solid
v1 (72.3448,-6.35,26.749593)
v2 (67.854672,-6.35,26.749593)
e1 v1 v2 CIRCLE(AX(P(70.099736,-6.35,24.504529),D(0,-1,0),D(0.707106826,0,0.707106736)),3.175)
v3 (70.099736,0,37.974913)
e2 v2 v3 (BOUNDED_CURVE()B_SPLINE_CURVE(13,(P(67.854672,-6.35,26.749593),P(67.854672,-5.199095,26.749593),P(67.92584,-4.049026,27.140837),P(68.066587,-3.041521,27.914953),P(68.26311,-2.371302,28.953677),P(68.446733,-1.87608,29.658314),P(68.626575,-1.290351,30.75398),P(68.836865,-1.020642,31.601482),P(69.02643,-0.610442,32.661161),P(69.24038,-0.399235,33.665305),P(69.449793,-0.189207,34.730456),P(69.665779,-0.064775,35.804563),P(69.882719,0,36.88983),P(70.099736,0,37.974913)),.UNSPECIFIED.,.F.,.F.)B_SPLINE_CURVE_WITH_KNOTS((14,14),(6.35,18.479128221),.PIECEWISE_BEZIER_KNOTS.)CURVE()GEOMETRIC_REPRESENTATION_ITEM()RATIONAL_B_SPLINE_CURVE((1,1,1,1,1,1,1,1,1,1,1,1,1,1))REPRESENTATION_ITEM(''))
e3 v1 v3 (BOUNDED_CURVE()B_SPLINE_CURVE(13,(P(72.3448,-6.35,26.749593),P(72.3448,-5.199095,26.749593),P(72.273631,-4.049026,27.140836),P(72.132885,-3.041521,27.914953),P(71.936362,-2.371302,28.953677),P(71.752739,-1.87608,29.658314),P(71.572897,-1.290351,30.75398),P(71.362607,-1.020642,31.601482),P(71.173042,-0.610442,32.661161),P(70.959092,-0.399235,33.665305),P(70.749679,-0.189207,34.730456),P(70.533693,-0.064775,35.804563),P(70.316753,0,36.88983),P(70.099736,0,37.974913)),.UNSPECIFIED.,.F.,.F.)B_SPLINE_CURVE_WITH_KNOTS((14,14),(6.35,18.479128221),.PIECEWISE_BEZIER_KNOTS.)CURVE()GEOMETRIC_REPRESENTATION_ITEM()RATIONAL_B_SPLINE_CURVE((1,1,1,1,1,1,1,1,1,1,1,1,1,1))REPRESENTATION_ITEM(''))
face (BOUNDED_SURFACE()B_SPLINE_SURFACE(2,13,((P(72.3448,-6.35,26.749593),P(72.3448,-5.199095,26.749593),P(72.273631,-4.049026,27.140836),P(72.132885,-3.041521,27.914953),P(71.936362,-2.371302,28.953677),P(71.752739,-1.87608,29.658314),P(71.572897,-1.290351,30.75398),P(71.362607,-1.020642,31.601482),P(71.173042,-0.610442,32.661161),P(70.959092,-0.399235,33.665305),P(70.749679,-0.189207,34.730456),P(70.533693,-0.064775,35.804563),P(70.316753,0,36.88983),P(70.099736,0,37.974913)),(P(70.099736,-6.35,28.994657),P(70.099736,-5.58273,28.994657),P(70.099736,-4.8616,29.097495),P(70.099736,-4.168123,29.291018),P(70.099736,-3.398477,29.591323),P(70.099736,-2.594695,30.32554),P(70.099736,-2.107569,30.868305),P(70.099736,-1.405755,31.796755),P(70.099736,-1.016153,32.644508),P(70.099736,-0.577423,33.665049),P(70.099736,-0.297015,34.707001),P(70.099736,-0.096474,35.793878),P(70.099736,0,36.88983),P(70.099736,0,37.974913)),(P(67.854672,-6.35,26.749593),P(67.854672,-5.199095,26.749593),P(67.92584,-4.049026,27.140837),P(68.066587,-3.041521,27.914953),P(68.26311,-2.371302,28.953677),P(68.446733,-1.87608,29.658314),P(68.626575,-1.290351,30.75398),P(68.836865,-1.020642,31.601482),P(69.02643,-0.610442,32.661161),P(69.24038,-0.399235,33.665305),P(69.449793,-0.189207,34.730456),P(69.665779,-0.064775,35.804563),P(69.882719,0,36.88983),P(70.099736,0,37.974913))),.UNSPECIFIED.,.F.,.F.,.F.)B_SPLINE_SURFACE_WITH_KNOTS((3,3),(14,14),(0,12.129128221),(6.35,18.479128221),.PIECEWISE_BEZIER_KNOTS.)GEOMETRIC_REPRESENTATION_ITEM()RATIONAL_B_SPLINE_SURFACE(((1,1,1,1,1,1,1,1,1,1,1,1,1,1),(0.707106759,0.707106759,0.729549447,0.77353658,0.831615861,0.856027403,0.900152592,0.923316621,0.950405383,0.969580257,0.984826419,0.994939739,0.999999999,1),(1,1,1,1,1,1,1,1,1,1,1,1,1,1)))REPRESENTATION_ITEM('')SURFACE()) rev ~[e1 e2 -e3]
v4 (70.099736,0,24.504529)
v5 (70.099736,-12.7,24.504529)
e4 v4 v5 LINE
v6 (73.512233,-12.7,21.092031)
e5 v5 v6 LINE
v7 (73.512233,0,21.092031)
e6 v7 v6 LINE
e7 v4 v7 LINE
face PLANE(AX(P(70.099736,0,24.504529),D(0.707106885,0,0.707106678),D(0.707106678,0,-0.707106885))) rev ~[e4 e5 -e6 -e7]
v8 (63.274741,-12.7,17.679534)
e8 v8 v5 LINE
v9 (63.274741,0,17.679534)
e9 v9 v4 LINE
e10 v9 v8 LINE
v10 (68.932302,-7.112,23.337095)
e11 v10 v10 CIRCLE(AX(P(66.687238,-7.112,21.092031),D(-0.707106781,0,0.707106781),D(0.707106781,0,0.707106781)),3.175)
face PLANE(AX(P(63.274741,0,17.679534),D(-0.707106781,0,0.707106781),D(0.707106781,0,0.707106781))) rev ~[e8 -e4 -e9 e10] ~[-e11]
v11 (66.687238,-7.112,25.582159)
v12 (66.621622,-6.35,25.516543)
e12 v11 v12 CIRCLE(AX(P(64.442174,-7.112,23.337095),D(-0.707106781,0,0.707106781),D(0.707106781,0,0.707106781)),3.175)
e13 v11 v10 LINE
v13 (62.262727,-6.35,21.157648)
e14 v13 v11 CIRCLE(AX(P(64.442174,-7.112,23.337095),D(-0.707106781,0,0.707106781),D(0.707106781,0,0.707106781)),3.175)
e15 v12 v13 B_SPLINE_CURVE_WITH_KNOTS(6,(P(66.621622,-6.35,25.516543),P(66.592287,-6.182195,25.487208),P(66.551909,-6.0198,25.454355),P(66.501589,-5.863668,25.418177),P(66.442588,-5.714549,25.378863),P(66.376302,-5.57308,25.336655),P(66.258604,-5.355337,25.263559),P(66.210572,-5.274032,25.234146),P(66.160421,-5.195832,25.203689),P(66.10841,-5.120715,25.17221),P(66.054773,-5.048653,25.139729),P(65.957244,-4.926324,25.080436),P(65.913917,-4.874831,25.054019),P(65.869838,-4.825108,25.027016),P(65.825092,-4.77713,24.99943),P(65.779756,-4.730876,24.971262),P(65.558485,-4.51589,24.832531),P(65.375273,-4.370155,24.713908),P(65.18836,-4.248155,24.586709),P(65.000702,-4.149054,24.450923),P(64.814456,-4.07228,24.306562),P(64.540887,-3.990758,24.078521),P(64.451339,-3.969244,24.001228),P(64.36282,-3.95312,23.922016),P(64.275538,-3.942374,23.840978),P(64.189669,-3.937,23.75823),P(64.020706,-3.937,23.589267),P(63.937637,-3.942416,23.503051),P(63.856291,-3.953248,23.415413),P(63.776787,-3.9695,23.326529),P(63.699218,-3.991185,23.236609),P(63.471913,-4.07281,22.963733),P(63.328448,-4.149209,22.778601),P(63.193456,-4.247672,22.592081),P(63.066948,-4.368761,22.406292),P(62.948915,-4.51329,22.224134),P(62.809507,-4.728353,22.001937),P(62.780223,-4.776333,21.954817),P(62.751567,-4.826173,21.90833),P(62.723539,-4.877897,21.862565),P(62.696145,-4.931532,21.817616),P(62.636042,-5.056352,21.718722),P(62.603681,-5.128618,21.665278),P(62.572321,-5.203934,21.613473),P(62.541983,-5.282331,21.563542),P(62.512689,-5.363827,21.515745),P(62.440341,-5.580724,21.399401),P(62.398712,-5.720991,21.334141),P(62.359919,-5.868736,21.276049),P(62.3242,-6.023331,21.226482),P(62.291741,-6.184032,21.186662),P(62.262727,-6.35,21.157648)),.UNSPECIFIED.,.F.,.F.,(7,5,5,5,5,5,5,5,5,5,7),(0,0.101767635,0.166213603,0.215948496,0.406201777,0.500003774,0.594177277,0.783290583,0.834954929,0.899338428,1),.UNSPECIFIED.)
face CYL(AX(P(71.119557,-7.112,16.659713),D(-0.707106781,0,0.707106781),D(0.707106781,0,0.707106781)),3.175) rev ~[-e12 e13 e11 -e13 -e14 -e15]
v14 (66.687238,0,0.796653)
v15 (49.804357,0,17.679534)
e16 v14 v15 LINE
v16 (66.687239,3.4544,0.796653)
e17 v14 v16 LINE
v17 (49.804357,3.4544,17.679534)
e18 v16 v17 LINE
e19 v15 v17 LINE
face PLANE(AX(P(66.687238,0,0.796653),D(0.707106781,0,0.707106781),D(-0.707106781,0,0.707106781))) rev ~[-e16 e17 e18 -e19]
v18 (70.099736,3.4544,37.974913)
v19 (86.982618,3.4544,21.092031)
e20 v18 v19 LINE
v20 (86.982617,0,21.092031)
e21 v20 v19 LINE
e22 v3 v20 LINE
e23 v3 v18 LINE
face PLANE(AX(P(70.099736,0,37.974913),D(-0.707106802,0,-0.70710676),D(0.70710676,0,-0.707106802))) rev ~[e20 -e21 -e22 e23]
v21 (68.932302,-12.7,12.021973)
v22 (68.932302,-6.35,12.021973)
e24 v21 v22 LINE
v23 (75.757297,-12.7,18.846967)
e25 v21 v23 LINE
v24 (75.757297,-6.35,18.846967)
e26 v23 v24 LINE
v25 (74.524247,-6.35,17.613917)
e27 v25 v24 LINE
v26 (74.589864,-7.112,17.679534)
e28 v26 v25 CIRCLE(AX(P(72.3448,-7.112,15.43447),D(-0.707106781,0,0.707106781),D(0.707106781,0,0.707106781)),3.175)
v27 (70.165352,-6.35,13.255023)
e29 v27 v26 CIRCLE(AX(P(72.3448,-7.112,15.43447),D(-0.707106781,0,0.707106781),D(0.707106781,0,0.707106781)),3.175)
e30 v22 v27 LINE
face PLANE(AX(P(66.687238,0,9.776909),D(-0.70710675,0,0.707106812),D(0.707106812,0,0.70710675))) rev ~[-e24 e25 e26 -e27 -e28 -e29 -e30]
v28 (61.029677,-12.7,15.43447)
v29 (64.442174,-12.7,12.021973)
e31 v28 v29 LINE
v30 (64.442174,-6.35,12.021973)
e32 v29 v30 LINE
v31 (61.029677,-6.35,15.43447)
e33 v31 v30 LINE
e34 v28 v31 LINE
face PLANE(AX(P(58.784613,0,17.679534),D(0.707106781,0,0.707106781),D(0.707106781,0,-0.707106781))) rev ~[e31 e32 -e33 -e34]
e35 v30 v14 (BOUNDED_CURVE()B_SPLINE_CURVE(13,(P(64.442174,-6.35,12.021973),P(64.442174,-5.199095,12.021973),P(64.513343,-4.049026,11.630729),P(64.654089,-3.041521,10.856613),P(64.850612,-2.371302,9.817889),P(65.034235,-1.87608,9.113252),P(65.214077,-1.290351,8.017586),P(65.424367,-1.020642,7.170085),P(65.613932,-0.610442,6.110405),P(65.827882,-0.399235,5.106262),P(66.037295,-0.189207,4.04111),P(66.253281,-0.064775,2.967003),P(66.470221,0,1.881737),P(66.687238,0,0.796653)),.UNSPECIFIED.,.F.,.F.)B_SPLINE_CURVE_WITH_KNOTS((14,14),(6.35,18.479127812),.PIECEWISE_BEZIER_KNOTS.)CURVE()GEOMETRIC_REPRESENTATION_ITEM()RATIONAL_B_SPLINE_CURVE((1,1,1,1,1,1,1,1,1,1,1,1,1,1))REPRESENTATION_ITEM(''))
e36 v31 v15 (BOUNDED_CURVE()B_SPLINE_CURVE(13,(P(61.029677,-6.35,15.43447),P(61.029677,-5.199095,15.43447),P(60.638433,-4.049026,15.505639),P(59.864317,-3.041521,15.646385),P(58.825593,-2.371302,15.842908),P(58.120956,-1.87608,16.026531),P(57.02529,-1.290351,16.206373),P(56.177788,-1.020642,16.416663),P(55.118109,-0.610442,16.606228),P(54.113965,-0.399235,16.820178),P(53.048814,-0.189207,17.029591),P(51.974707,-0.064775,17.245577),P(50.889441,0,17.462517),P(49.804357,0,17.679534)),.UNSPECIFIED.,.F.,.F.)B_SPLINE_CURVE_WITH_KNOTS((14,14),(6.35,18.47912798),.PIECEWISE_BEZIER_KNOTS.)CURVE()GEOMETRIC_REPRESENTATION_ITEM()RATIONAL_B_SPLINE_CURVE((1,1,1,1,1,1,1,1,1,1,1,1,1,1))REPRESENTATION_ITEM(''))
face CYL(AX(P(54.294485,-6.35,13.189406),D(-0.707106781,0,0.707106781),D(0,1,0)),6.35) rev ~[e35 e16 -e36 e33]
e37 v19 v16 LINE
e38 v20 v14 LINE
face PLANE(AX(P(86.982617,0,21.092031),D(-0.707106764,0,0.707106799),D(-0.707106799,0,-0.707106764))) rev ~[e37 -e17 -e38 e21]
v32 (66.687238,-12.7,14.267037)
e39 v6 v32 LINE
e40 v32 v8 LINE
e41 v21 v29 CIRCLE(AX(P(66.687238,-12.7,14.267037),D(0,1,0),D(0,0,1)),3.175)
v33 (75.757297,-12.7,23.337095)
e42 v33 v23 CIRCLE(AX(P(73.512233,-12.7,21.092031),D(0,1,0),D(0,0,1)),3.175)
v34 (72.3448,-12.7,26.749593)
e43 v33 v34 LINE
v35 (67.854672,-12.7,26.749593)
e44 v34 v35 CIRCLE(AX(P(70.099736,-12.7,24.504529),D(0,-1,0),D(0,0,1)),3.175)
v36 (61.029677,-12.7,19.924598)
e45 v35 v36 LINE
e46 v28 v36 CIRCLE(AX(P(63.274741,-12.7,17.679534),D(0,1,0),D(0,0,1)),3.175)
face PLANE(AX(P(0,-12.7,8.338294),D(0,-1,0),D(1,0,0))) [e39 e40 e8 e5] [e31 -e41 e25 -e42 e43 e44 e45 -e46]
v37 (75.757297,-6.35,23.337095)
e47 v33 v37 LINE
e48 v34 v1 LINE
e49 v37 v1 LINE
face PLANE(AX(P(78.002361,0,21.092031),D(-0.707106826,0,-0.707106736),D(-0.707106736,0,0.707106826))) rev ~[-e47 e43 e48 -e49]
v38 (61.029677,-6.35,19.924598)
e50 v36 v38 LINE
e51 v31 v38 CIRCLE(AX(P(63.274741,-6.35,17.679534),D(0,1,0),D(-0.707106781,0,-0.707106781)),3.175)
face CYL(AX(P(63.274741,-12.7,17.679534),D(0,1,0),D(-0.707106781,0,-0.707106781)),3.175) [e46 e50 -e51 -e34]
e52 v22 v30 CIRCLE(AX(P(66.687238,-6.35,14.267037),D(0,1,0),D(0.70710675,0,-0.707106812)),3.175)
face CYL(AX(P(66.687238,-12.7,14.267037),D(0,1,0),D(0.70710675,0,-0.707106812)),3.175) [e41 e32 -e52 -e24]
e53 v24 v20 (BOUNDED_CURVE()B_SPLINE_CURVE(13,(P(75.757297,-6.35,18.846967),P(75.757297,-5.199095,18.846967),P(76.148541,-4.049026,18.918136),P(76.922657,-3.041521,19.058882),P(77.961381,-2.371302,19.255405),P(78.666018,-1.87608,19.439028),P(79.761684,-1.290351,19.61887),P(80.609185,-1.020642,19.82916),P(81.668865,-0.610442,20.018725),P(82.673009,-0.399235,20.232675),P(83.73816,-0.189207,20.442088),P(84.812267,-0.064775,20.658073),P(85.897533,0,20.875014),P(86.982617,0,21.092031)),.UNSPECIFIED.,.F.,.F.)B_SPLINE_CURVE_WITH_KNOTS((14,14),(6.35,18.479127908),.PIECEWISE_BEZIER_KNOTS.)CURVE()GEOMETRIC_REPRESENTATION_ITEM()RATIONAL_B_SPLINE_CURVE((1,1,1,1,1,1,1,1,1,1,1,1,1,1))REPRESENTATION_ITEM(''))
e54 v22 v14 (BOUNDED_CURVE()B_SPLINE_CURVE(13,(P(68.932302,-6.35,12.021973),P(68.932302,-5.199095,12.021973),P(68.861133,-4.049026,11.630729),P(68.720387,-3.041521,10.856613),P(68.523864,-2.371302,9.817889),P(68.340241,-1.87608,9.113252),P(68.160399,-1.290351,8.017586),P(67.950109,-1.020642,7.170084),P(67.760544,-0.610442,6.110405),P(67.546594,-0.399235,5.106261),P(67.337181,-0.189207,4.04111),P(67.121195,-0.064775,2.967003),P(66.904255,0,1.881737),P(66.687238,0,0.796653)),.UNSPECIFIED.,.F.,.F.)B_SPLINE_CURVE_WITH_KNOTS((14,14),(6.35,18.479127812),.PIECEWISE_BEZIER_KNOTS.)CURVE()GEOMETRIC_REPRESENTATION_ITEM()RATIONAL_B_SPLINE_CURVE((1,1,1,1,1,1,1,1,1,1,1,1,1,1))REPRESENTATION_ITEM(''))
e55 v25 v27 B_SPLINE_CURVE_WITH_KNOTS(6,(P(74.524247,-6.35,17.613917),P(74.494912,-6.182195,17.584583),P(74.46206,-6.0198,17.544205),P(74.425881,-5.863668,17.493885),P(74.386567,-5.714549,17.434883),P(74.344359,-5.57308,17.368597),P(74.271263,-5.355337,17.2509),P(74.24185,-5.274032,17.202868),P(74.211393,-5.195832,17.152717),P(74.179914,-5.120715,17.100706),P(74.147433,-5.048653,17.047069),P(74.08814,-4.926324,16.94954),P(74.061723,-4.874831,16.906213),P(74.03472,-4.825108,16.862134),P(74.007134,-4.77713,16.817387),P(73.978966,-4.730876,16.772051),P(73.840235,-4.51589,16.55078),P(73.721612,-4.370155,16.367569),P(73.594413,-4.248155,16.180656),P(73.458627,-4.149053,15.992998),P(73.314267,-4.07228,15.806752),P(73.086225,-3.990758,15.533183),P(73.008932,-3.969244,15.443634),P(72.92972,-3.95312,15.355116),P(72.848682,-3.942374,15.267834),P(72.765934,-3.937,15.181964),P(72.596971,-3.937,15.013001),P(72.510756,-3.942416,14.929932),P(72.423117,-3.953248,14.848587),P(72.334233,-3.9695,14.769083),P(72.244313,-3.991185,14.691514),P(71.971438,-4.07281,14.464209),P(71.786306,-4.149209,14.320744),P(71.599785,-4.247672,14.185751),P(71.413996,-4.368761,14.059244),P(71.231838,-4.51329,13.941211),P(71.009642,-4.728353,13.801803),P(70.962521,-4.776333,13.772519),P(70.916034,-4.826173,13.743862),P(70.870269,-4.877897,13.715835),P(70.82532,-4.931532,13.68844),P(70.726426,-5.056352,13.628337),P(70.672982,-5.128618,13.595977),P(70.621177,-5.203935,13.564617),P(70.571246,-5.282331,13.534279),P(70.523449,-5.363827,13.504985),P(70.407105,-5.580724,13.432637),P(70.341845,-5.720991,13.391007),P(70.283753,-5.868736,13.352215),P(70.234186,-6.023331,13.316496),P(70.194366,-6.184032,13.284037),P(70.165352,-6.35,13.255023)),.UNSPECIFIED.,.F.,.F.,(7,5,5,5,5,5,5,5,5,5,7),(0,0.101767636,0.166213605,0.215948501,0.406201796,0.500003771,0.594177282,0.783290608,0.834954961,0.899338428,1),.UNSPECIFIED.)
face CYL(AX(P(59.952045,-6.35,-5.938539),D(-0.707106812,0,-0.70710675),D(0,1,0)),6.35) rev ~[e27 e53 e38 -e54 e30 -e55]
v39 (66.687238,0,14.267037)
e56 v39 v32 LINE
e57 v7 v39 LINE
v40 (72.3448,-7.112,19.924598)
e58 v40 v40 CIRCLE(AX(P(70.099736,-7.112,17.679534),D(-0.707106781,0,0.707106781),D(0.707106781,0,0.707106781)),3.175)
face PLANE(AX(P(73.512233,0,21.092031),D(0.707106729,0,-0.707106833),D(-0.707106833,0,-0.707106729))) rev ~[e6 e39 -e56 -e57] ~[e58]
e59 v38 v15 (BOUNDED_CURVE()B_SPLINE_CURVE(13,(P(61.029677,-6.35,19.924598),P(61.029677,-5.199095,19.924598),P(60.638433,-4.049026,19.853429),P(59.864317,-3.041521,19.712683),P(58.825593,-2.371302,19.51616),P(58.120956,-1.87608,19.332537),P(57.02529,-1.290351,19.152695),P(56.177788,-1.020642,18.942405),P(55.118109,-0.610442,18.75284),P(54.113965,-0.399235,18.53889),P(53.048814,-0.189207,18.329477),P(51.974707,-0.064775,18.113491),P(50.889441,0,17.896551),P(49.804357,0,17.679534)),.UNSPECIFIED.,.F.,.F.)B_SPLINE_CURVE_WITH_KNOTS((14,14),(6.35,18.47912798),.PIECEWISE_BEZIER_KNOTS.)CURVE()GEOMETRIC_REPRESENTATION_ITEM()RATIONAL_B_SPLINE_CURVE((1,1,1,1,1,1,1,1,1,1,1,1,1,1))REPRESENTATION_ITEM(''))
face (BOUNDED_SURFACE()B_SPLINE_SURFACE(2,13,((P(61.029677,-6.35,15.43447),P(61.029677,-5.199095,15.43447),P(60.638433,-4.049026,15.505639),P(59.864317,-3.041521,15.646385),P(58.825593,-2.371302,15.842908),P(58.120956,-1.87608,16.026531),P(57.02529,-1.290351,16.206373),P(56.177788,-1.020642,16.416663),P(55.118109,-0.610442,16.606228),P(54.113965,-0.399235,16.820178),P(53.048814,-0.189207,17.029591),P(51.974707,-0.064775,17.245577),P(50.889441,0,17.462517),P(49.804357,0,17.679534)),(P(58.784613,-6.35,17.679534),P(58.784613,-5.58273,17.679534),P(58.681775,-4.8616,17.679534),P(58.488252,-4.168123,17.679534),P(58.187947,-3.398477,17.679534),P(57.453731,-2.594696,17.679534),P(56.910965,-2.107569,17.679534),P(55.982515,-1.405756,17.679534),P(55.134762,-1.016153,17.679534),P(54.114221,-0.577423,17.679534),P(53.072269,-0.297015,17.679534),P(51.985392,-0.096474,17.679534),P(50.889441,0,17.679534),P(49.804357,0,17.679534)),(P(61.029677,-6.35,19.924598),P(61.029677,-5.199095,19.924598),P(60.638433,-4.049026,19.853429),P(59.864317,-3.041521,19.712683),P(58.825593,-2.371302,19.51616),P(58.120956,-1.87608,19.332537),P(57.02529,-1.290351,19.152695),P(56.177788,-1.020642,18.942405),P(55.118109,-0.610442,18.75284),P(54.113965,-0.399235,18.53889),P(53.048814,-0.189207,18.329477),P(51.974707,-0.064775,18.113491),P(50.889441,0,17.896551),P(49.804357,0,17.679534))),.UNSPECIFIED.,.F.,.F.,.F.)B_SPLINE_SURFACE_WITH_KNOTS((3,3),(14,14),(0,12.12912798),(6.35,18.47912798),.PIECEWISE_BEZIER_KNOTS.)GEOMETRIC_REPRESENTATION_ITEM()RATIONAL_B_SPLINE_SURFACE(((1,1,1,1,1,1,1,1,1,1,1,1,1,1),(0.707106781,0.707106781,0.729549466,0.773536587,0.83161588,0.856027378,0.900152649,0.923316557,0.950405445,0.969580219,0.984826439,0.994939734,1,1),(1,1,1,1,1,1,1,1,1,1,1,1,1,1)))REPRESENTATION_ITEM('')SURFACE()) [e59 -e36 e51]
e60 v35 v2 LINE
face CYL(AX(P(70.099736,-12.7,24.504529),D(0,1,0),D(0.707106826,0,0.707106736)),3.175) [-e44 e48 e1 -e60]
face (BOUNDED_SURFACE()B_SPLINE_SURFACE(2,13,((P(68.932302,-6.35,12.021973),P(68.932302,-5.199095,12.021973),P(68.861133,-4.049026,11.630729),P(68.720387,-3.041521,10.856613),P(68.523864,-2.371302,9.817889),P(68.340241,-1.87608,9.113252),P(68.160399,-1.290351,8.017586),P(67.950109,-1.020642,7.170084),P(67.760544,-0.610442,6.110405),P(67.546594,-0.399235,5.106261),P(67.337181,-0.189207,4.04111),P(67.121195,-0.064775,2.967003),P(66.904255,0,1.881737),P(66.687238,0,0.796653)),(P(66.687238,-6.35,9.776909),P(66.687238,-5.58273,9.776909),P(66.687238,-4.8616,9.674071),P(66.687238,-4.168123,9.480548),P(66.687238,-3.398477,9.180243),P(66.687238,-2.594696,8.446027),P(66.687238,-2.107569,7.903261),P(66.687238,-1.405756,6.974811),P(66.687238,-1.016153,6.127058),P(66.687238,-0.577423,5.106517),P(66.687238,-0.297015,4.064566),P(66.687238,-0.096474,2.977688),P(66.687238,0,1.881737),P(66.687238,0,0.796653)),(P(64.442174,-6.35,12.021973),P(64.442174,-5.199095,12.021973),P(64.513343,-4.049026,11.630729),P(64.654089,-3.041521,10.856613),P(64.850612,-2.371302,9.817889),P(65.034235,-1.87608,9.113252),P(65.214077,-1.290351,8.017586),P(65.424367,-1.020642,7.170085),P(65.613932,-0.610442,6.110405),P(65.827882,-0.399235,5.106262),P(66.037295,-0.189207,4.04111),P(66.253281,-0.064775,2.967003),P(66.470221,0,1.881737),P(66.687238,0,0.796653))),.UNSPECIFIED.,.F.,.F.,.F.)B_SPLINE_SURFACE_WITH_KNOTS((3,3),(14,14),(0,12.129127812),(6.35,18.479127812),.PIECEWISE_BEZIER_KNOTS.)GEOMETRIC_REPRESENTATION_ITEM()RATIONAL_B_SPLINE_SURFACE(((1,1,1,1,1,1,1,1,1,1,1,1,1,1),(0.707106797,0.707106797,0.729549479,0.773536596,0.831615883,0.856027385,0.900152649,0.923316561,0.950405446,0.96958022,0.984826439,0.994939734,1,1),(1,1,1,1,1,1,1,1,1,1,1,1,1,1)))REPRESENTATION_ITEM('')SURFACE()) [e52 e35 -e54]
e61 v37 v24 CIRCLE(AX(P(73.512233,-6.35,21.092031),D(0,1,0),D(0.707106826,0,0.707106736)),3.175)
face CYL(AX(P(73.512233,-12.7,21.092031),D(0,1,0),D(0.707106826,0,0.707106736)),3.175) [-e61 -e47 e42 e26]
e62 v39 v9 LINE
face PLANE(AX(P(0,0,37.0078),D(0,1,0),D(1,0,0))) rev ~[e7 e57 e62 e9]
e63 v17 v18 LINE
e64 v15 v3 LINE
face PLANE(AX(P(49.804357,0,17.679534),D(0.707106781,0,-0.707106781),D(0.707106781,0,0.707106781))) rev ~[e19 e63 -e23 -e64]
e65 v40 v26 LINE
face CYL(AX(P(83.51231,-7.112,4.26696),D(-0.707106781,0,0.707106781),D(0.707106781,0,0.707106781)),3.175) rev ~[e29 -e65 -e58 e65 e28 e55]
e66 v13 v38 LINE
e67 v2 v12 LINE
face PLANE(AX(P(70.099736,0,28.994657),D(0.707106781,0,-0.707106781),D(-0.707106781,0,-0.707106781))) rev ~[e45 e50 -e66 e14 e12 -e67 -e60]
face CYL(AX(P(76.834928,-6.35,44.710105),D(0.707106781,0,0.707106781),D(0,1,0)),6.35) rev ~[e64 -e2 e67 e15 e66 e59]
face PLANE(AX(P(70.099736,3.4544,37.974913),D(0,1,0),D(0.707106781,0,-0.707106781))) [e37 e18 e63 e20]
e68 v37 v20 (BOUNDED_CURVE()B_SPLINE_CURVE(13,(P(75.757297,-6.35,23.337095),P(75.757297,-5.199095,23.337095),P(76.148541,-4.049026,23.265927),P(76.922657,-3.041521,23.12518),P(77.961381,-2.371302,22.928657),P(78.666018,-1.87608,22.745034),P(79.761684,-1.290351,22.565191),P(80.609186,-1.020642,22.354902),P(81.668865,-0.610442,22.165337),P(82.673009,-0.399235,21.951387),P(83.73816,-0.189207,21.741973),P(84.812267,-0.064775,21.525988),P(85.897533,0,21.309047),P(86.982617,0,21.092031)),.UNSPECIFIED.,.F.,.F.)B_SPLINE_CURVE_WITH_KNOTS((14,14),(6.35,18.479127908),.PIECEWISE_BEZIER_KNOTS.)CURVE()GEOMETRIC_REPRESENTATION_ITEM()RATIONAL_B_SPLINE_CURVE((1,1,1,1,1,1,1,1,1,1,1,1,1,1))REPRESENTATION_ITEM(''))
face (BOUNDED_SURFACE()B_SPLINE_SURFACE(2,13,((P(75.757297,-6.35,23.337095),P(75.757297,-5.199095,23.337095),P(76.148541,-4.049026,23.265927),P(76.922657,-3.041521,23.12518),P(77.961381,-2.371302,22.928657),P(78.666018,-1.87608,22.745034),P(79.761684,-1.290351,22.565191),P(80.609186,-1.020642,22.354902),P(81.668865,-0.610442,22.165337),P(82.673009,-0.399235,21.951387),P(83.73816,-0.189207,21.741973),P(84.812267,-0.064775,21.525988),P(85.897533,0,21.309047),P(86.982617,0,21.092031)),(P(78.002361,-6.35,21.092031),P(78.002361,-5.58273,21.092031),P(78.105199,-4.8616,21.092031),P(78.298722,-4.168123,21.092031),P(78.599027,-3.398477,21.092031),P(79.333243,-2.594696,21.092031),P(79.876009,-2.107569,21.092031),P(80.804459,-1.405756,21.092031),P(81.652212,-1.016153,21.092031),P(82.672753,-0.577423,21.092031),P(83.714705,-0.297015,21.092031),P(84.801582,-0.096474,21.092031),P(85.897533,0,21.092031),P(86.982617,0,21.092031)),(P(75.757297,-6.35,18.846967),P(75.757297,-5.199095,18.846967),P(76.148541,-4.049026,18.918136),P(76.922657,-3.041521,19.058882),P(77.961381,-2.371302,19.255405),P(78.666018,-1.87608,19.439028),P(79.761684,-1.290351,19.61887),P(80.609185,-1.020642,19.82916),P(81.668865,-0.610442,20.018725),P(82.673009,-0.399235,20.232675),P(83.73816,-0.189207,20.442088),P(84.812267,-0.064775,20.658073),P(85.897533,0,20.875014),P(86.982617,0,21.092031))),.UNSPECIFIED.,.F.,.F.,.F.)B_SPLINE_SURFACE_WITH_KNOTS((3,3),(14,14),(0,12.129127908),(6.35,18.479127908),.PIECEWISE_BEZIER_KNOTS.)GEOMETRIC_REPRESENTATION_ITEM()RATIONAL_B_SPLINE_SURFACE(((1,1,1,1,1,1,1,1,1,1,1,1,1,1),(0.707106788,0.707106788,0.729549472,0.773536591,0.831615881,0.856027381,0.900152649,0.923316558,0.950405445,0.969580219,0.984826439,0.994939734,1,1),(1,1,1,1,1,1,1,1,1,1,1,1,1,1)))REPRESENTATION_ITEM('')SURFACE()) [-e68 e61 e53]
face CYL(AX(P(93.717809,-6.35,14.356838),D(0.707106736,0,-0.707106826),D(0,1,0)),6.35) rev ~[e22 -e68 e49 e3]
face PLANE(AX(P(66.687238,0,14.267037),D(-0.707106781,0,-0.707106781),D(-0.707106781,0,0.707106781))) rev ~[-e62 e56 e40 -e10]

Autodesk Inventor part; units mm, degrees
ref_plane "YZ Plane" through (0, 0, 0) normal (1, 0, 0) x (0, 1, 0)
ref_plane "XZ Plane" through (0, 0, 0) normal (0, 1, 0) x (-1, 0, 0)
ref_plane "XY Plane" through (0, 0, 0) normal (0, 0, 1) x (1, 0, 0)
sketch "Sketch1" plane through (0, 0, 0) normal (1, 0, 0) x (0, 1, 0)
  line L0 (0, 0) -> (41.5544, 0)
  line L1 (41.5544, 0) -> (41.5544, 37.0078)
  line L2 (41.5544, 37.0078) -> (0, 37.0078)
  line L3 (0, 37.0078) -> (0, 0)
  circle A0 centre (20.7772, 18.5039) radius 12.8778
  dimension "d0" = 41.5544
  dimension "d1" = 37.0078
  dimension "d2" = 25.7556
sketch "Sketch1 outline for Extrusion1" plane through (0, 0, 0) normal (1, 0, 0) x (0, 1, 0)
  line L0 (0, 0) -> (41.5544, 0)
  line L1 (0, 37.0078) -> (0, 0)
  line L2 (41.5544, 0) -> (41.5544, 37.0078)
  line L3 (41.5544, 37.0078) -> (0, 37.0078)
  circle A0 centre (20.7772, 18.5039) radius 12.8778
extrude "Extrusion1" add sketch "Sketch1 outline for Extrusion1" along normal blind 50.8
sketch "Sketch2" plane through (0, 0, 0) normal (0, 0, -1) x (-1, 0, 0)
  line L0 (-50.8, 0) -> (-50.8, 41.5544) projected
  line L1 (-50.8, 41.5544) -> (-87.8078, 41.5544)
  line L2 (-87.8078, 41.5544) -> (-87.8078, 0)
  line L3 (-87.8078, 0) -> (-50.8, 0)
  line L4 (-50.8, 0) -> (-50.8, 41.5544)
  circle A0 centre (-69.3039, 20.7772) radius 12.8778
  dimension "d5" = 37.0078
  dimension "d6" = 25.7556
sketch "Sketch2 outline for Extrusion2" plane through (0, 0, 0) normal (0, 0, -1) x (-1, 0, 0)
  line L0 (-50.8, 41.5544) -> (-87.8078, 41.5544)
  line L1 (-50.8, 0) -> (-50.8, 41.5544)
  line L2 (-87.8078, 0) -> (-50.8, 0)
  line L3 (-87.8078, 41.5544) -> (-87.8078, 0)
extrude "Extrusion2" add sketch "Sketch2 outline for Extrusion2" against normal up to surface (37.0078 mm away)
sketch "Sketch3" plane through (0, 0, 0) normal (0, 0, -1) x (-1, 0, 0)
  line L0 (0, 41.5544) -> (-87.8078, 41.5544) projected
  line L1 (-87.8078, 41.5544) -> (-87.8078, 0) projected
  line L2 (0, 0) -> (-87.8078, 0) projected
  line L3 (0, 0) -> (-87.8078, 0) projected
  line L4 (-87.8078, 41.5544) -> (-50.8, 41.5544)
  line L5 (-50.8, 41.5544) -> (-50.8, 0)
  line L6 (-50.8, 0) -> (-87.8078, 0)
  line L7 (-87.8078, 0) -> (-87.8078, 41.5544)
  circle A0 centre (-69.3039, 20.7772) radius 12.8778
  point P0 (-50.8, 0)
  dimension "d9" = 37.0078
  dimension "d10" = 25.7556
sketch "Sketch3 outline for Extrusion3" plane through (0, 0, 0) normal (0, 0, -1) x (-1, 0, 0)
  line L0 (-50.8, 0) -> (-50.8, 41.5544)
  line L1 (-87.8078, 0) -> (-50.8, 0)
  line L2 (-50.8, 41.5544) -> (-87.8078, 41.5544)
  line L3 (-87.8078, 41.5544) -> (-87.8078, 0)
  circle A0 centre (-69.3039, 20.7772) radius 12.8778
extrude "Extrusion3" add sketch "Sketch3 outline for Extrusion3" along normal blind 50.8
sketch "Sketch4" plane through (0, 41.5544, 37.0078) normal (0, 1, 0) x (1, 0, 0)
  line L0 (0, 0) -> (87.8078, 0)
  line L1 (87.8078, 87.8078) -> (87.8078, 0)
  line L2 (50.8, 37.0078) -> (50.8, 87.8078)
  line L3 (87.8078, 0) -> (87.8078, 87.8078)
  line L4 (50.8, 37.0078) -> (87.8078, 0)
  line L5 (87.8078, 0) -> (123.159418, -36.481545)
  line L6 (87.8078, 0) -> (100.892033, 13.084233)
  line L7 (0, 0) -> (87.8078, 0)
  line L8 (87.8078, 0) -> (74.723567, -13.084233)
  line L9 (100.892033, 13.084233) -> (87.8078, 26.168466)
  line L10 (74.723567, -13.084233) -> (61.639334, 0)
  line L11 (100.892033, 13.084233) -> (136.808615, -22.832348)
  line L12 (136.808615, -22.832348) -> (123.159418, -36.481545)
  line L13 (123.159418, -36.481545) -> (110.640148, -49.000815)
  line L14 (123.159418, -36.481545) -> (140.864338, -36.481545) construction
  line L15 (110.640148, -49.000815) -> (74.723567, -13.084233)
  dimension "d13" = 50.8
  dimension "d14" = 18.5039
  dimension "d15" = 18.5039
  dimension "d16" = 135
sketch "Sketch4 outline for Extrusion4" plane through (0, 41.5544, 37.0078) normal (0, 1, 0) x (1, 0, 0)
  line L0 (87.8078, 0) -> (61.639334, 0)
  line L1 (87.8078, 26.168466) -> (87.8078, 0)
  line L2 (100.892033, 13.084233) -> (87.8078, 26.168466)
  line L3 (136.808615, -22.832348) -> (100.892033, 13.084233)
  line L4 (123.159418, -36.481545) -> (136.808615, -22.832348)
  line L5 (110.640148, -49.000815) -> (123.159418, -36.481545)
  line L6 (74.723567, -13.084233) -> (110.640148, -49.000815)
  line L7 (61.639334, 0) -> (74.723567, -13.084233)
extrude "Extrusion4" add sketch "Sketch4 outline for Extrusion4" against normal up to surface (41.5544 mm away)
sketch "Sketch5" plane through (136.808615, 0, 59.840148) normal (0.7071068, 0, 0.7071068) x (0.7071068, 0, -0.7071068)
  line L0 (-18.5039, 41.5544) -> (-18.5039, 0) projected
  circle A0 centre (-18.5039, 20.7772) radius 12.8778
  point P0 (-54.424924, 0)
  dimension "d19" = 25.7556
sketch "Sketch5 outline for Extrusion5" plane through (136.808615, 0, 59.840148) normal (0.7071068, 0, 0.7071068) x (0.7071068, 0, -0.7071068)
  circle A0 centre (-18.5039, 20.7772) radius 12.8778
extrude "Extrusion5" cut sketch "Sketch5 outline for Extrusion5" against normal blind 76.2
sketch "Sketch6" plane through (0, 41.5544, 37.0078) normal (0, 1, 0) x (1, 0, 0)
  line L0 (0, 37.0078) -> (0, 0)
  line L1 (0, 0) -> (61.639334, 0)
  line L2 (61.639334, 0) -> (110.640148, -49.000815)
  line L3 (110.640148, -49.000815) -> (136.808615, -22.832348)
  line L4 (136.808615, -22.832348) -> (87.8078, 26.168466)
  line L5 (87.8078, 87.8078) -> (87.8078, 26.168466)
  line L6 (50.8, 87.8078) -> (87.8078, 87.8078)
  line L7 (50.8, 37.0078) -> (50.8, 87.8078)
  line L8 (0, 37.0078) -> (50.8, 37.0078)
  line L9 (0, 18.5039) -> (69.3039, 18.5039)
  line L10 (69.3039, 18.5039) -> (69.3039, 87.8078)
  line L11 (56.4261, 87.8078) -> (82.1817, 87.8078)
  line L12 (69.3039, 18.5039) -> (123.724381, -35.916581)
  circle A0 centre (2.4892, 2.879001) radius 1.5875
  circle A1 centre (2.4892, 34.128799) radius 1.5875
  circle A2 centre (84.928799, 85.3186) radius 1.5875
  circle A3 centre (53.679001, 85.3186) radius 1.5875
  circle A4 centre (110.915779, -45.204923) radius 1.5875
  circle A5 centre (133.012723, -23.107979) radius 1.5875
  dimension "d22" = 3.175
  dimension "d23" = 3.175
  dimension "d24" = 2.4892
  dimension "d25" = 2.4892
  dimension "d26" = 2.879
  dimension "d27" = 2.879
  dimension "d28" = 3.175
  dimension "d29" = 3.175
  dimension "d30" = 2.4892
  dimension "d31" = 2.4892
  dimension "d32" = 2.879
  dimension "d33" = 2.879
  dimension "d34" = 3.175
  dimension "d35" = 3.175
  dimension "d36" = 2.4892
  dimension "d37" = 2.4892
  dimension "d38" = 2.879
  dimension "d39" = 2.879
sketch "Sketch6 outline for Extrusion6" plane through (0, 41.5544, 37.0078) normal (0, 1, 0) x (1, 0, 0)
  circle A0 centre (110.915779, -45.204923) radius 1.5875
  circle A1 centre (133.012723, -23.107979) radius 1.5875
  circle A2 centre (2.4892, 34.128799) radius 1.5875
  circle A3 centre (2.4892, 2.879001) radius 1.5875
  circle A4 centre (53.679001, 85.3186) radius 1.5875
  circle A5 centre (84.928799, 85.3186) radius 1.5875
extrude "Extrusion6" cut sketch "Sketch6 outline for Extrusion6" against normal blind 50.8
sketch "Sketch7" plane through (0, 41.5544, 37.0078) normal (0, 1, 0) x (1, 0, 0)
  circle A0 centre (2.4892, 2.879001) radius 1.5875
  circle A1 centre (110.915779, -45.204923) radius 1.5875
  circle A2 centre (53.679001, 85.3186) radius 1.5875
  circle A3 centre (2.4892, 34.128799) radius 1.5875
  circle A4 centre (84.928799, 85.3186) radius 1.5875
  line L0 (0, 37.0078) -> (0, 0)
  line L1 (0, 0) -> (61.639334, 0)
  line L2 (61.639334, 0) -> (110.640148, -49.000815)
  line L3 (110.640148, -49.000815) -> (136.808615, -22.832348)
  line L4 (136.808615, -22.832348) -> (87.8078, 26.168466)
  line L5 (87.8078, 87.8078) -> (87.8078, 26.168466)
  line L6 (50.8, 87.8078) -> (87.8078, 87.8078)
  line L7 (50.8, 37.0078) -> (50.8, 87.8078)
  line L8 (0, 37.0078) -> (50.8, 37.0078)
  circle A5 centre (133.012723, -23.107979) radius 1.5875
  circle A6 centre (133.012723, -23.107979) radius 6
  circle A7 centre (110.915779, -45.204923) radius 6
  circle A8 centre (2.4892, 2.879001) radius 6
  circle A9 centre (2.4892, 34.128799) radius 6
  circle A10 centre (53.679001, 85.3186) radius 6
  circle A11 centre (84.928799, 85.3186) radius 6
  point P0 (0, 8.338294)
  point P1 (7.753357, 0)
  point P2 (7.753357, 37.0078)
  point P3 (0, 28.669506)
  point P4 (59.138294, 87.8078)
  point P5 (50.8, 80.054443)
  point P6 (79.469506, 87.8078)
  point P7 (87.8078, 80.054443)
  point P8 (130.91255, -28.728413)
  point P9 (131.326163, -17.349897)
  point P10 (105.157697, -43.518363)
  point P11 (116.536213, -43.10475)
  dimension "d42" = 12
  dimension "d43" = 12
  dimension "d44" = 12
  dimension "d45" = 12
  dimension "d46" = 12
  dimension "d47" = 12
sketch "Sketch7 outline for Extrusion7" plane through (0, 41.5544, 37.0078) normal (0, 1, 0) x (1, 0, 0)
  arc A0 (0, 8.338294) -> (7.753357, 0) centre (2.4892, 2.879001) ccw
  line L0 (0, 0) -> (0, 8.338294)
  line L1 (7.753357, 0) -> (0, 0)
  arc A1 (7.753357, 37.0078) -> (0, 28.669506) centre (2.4892, 34.128799) ccw
  line L2 (0, 37.0078) -> (7.753357, 37.0078)
  line L3 (0, 28.669506) -> (0, 37.0078)
  arc A2 (59.138294, 87.8078) -> (50.8, 80.054443) centre (53.679001, 85.3186) ccw
  line L4 (50.8, 87.8078) -> (59.138294, 87.8078)
  line L5 (50.8, 80.054443) -> (50.8, 87.8078)
  arc A3 (87.8078, 80.054443) -> (79.469506, 87.8078) centre (84.928799, 85.3186) ccw
  line L6 (87.8078, 87.8078) -> (87.8078, 80.054443)
  line L7 (79.469506, 87.8078) -> (87.8078, 87.8078)
  arc A4 (130.91255, -28.728413) -> (131.326163, -17.349897) centre (133.012723, -23.107979) ccw
  line L8 (136.808615, -22.832348) -> (130.91255, -28.728413)
  line L9 (131.326163, -17.349897) -> (136.808615, -22.832348)
  arc A5 (105.157697, -43.518363) -> (116.536213, -43.10475) centre (110.915779, -45.204923) ccw
  line L10 (110.640148, -49.000815) -> (105.157697, -43.518363)
  line L11 (116.536213, -43.10475) -> (110.640148, -49.000815)
extrude "Extrusion7" add sketch "Sketch7 outline for Extrusion7" against normal blind 4.7752
sketch "Sketch8" plane through (0, 0, 0) normal (0, -1, 0) x (1, 0, 0)
  circle A0 centre (2.4892, 34.128799) radius 1.5875
  circle A1 centre (53.679001, -48.3108) radius 1.5875
  circle A2 centre (2.4892, 2.879001) radius 1.5875
  circle A3 centre (84.928799, -48.3108) radius 1.5875
  line L0 (0, 37.0078) -> (0, 0)
  line L1 (0, 0) -> (50.8, 0)
  line L2 (50.8, 0) -> (50.8, -50.8)
  line L3 (87.8078, -50.8) -> (50.8, -50.8)
  line L4 (87.8078, 10.839334) -> (87.8078, -50.8)
  line L5 (136.808615, 59.840148) -> (87.8078, 10.839334)
  line L6 (110.640148, 86.008615) -> (136.808615, 59.840148)
  line L7 (61.639334, 37.0078) -> (110.640148, 86.008615)
  line L8 (0, 37.0078) -> (61.639334, 37.0078)
  circle A4 centre (110.915779, 82.212723) radius 1.5875
  circle A5 centre (110.915779, 82.212723) radius 6
  circle A6 centre (133.012723, 60.115779) radius 1.5875
  circle A7 centre (133.012723, 60.115779) radius 6
  circle A8 centre (84.928799, -48.3108) radius 6
  circle A9 centre (53.679001, -48.3108) radius 6
  circle A10 centre (2.4892, 2.879001) radius 6
  circle A11 centre (2.4892, 34.128799) radius 6
  point P0 (0, 8.338294)
  point P1 (7.753357, 0)
  point P2 (7.753357, 37.0078)
  point P3 (0, 28.669506)
  point P4 (116.536213, 80.11255)
  point P5 (105.157697, 80.526163)
  point P6 (131.326163, 54.357697)
  point P7 (130.91255, 65.736213)
  point P8 (87.8078, -43.046643)
  point P9 (79.469506, -50.8)
  point P10 (50.8, -43.046643)
  point P11 (59.138294, -50.8)
  dimension "d50" = 12
sketch "Sketch8 outline for Extrusion8" plane through (0, 0, 0) normal (0, -1, 0) x (1, 0, 0)
  arc A0 (0, 8.338294) -> (7.753357, 0) centre (2.4892, 2.879001) ccw
  line L0 (0, 0) -> (0, 8.338294)
  line L1 (7.753357, 0) -> (0, 0)
  arc A1 (7.753357, 37.0078) -> (0, 28.669506) centre (2.4892, 34.128799) ccw
  line L2 (0, 37.0078) -> (7.753357, 37.0078)
  line L3 (0, 28.669506) -> (0, 37.0078)
  arc A2 (116.536213, 80.11255) -> (105.157697, 80.526163) centre (110.915779, 82.212723) ccw
  line L4 (110.640148, 86.008615) -> (116.536213, 80.11255)
  line L5 (105.157697, 80.526163) -> (110.640148, 86.008615)
  arc A3 (131.326163, 54.357697) -> (130.91255, 65.736213) centre (133.012723, 60.115779) ccw
  line L6 (136.808615, 59.840148) -> (131.326163, 54.357697)
  line L7 (130.91255, 65.736213) -> (136.808615, 59.840148)
  arc A4 (79.469506, -50.8) -> (87.8078, -43.046643) centre (84.928799, -48.3108) ccw
  line L8 (87.8078, -50.8) -> (79.469506, -50.8)
  line L9 (87.8078, -43.046643) -> (87.8078, -50.8)
  arc A5 (50.8, -43.046643) -> (59.138294, -50.8) centre (53.679001, -48.3108) ccw
  line L10 (50.8, -50.8) -> (50.8, -43.046643)
  line L11 (59.138294, -50.8) -> (50.8, -50.8)
extrude "Extrusion8" add sketch "Sketch8 outline for Extrusion8" against normal blind 4.7752
sketch "Sketch9" plane through (0, 41.5544, 28.669506) normal (0, 1, 0) x (1, 0, 0)
  circle A0 centre (2.4892, -5.459293) radius 1.5875
  circle A1 centre (110.915779, -53.543218) radius 1.5875
  circle A2 centre (53.679001, 76.980306) radius 1.5875
  circle A3 centre (2.4892, 25.790504) radius 1.5875
  circle A4 centre (133.012723, -31.446274) radius 1.5875
  circle A5 centre (84.928799, 76.980306) radius 1.5875
  arc A6 (0, 0) -> (7.753357, -8.338294) centre (2.4892, -5.459293) ccw
  arc A7 (105.157697, -51.856657) -> (116.536213, -51.443044) centre (110.915779, -53.543218) ccw
  arc A8 (87.8078, 71.716148) -> (79.469506, 79.469506) centre (84.928799, 76.980306) ccw
  arc A9 (7.753357, 28.669506) -> (0, 20.331211) centre (2.4892, 25.790504) ccw
  circle A10 centre (110.915779, -53.543218) radius 2.925
  circle A11 centre (133.012723, -31.446274) radius 1.5875
  circle A12 centre (133.012723, -31.446274) radius 2.925
  circle A13 centre (84.928799, 76.980306) radius 2.925
  circle A14 centre (53.679001, 76.980306) radius 1.5875
  circle A15 centre (53.679001, 76.980306) radius 2.925
  circle A16 centre (2.4892, 25.790504) radius 2.925
  circle A17 centre (2.4892, -5.459293) radius 2.925
  point P0 (0, 28.669506)
  dimension "d53" = 5.85
  dimension "d54" = 5.85
  dimension "d55" = 5.85
  dimension "d56" = 5.85
  dimension "d57" = 5.85
  dimension "d58" = 5.85
sketch "Sketch10" plane through (0, 0, -50.8) normal (0, 0, -1) x (-1, 0, 0)
  line L0 (-59.138294, 4.7752) -> (-50.8, 4.7752)
  line L1 (-50.8, 4.7752) -> (-50.8, 36.7792)
  line L2 (-50.8, 36.7792) -> (-59.138294, 36.7792)
  line L3 (-79.469506, 36.7792) -> (-87.8078, 36.7792)
  line L4 (-87.8078, 36.7792) -> (-87.8078, 4.7752)
  line L5 (-87.8078, 4.7752) -> (-79.469506, 4.7752)
  circle A0 centre (-69.3039, 20.7772) radius 12.8778
  line L6 (-87.8078, 4.7752) -> (-50.8, 4.7752)
  line L7 (-50.8, 4.7752) -> (-50.8, 36.7792)
  line L8 (-50.8, 36.7792) -> (-87.8078, 36.7792)
  line L9 (-87.8078, 36.7792) -> (-87.8078, 4.7752)
  line L10 (-87.8078, 4.7752) -> (-50.8, 36.7792) construction
  line L11 (-50.8, 4.7752) -> (-87.8078, 36.7792) construction
  point P0 (0, 0)
sketch "Sketch10 outline for Extrusion9" plane through (0, 0, -50.8) normal (0, 0, -1) x (-1, 0, 0)
  line L0 (-59.138294, 36.7792) -> (-79.469506, 36.7792)
  line L1 (-50.8, 36.7792) -> (-59.138294, 36.7792)
  line L2 (-79.469506, 36.7792) -> (-87.8078, 36.7792)
  line L3 (-50.8, 4.7752) -> (-50.8, 36.7792)
  line L4 (-87.8078, 36.7792) -> (-87.8078, 4.7752)
  line L5 (-59.138294, 4.7752) -> (-50.8, 4.7752)
  line L6 (-87.8078, 4.7752) -> (-79.469506, 4.7752)
  line L7 (-79.469506, 4.7752) -> (-59.138294, 4.7752)
  circle A0 centre (-69.3039, 20.7772) radius 12.8778
extrude "Extrusion9" cut sketch "Sketch10 outline for Extrusion9" against normal blind 5.0038
sketch "Sketch11" plane through (0, 0, 0) normal (-1, 0, 0) x (0, 0, 1)
  line L0 (28.669506, 4.7752) -> (37.0078, 4.7752)
  line L1 (37.0078, 36.7792) -> (37.0078, 4.7752)
  line L2 (37.0078, 36.7792) -> (28.669506, 36.7792)
  line L3 (8.338294, 36.7792) -> (0, 36.7792)
  line L4 (0, 4.7752) -> (0, 36.7792)
  line L5 (0, 4.7752) -> (8.338294, 4.7752)
  circle A0 centre (18.5039, 20.7772) radius 12.8778
  line L6 (0, 4.7752) -> (37.0078, 4.7752)
  line L7 (37.0078, 4.7752) -> (37.0078, 36.7792)
  line L8 (37.0078, 36.7792) -> (0, 36.7792)
  line L9 (0, 36.7792) -> (0, 4.7752)
  line L10 (0, 4.7752) -> (37.0078, 36.7792) construction
  line L11 (37.0078, 4.7752) -> (0, 36.7792) construction
  point P0 (0, 0)
sketch "Sketch11 outline for Extrusion10" plane through (0, 0, 0) normal (-1, 0, 0) x (0, 0, 1)
  line L0 (28.669506, 36.7792) -> (8.338294, 36.7792)
  line L1 (37.0078, 36.7792) -> (28.669506, 36.7792)
  line L2 (8.338294, 36.7792) -> (0, 36.7792)
  line L3 (37.0078, 4.7752) -> (37.0078, 36.7792)
  line L4 (0, 36.7792) -> (0, 4.7752)
  line L5 (28.669506, 4.7752) -> (37.0078, 4.7752)
  line L6 (0, 4.7752) -> (8.338294, 4.7752)
  line L7 (8.338294, 4.7752) -> (28.669506, 4.7752)
  circle A0 centre (18.5039, 20.7772) radius 12.8778
extrude "Extrusion10" cut sketch "Sketch11 outline for Extrusion10" against normal blind 5.0038
sketch "Sketch12" plane through (130.91255, 36.7792, 65.736213) normal (0.7071068, 0, 0.7071068) x (0.7071068, 0, -0.7071068)
  line L0 (0, -32.004) -> (8.338294, -32.004)
  line L1 (8.338294, 0) -> (8.338294, -32.004)
  line L2 (8.338294, 0) -> (0, 0)
  line L3 (-20.331211, 0) -> (-28.669506, 0)
  line L4 (-28.669506, 0) -> (-28.669506, -32.004)
  line L5 (-28.669506, -32.004) -> (-20.331211, -32.004)
  circle A0 centre (-10.165606, -16.002) radius 12.8778
  line L6 (-28.669506, -32.004) -> (8.338294, -32.004)
  line L7 (8.338294, -32.004) -> (8.338294, 0)
  line L8 (8.338294, 0) -> (-28.669506, 0)
  line L9 (-28.669506, 0) -> (-28.669506, -32.004)
  line L10 (-28.669506, -32.004) -> (8.338294, 0) construction
  line L11 (8.338294, -32.004) -> (-28.669506, 0) construction
  point P0 (-46.08663, -36.7792)
  point P1 (-20.331211, 0)
  point P2 (-20.331211, -32.004)
sketch "Sketch12 outline for Extrusion11" plane through (130.91255, 36.7792, 65.736213) normal (0.7071068, 0, 0.7071068) x (0.7071068, 0, -0.7071068)
  line L0 (0, 0) -> (-20.331211, 0)
  line L1 (8.338294, 0) -> (0, 0)
  line L2 (-20.331211, 0) -> (-28.669506, 0)
  line L3 (8.338294, -32.004) -> (8.338294, 0)
  line L4 (-28.669506, 0) -> (-28.669506, -32.004)
  line L5 (0, -32.004) -> (8.338294, -32.004)
  line L6 (-28.669506, -32.004) -> (-20.331211, -32.004)
  line L7 (-20.331211, -32.004) -> (0, -32.004)
  circle A0 centre (-10.165606, -16.002) radius 12.8778
extrude "Extrusion11" cut sketch "Sketch12 outline for Extrusion11" against normal blind 5.0038
sketch "Sketch9 outline for Extrusion12" plane through (0, 41.5544, 28.669506) normal (0, 1, 0) x (1, 0, 0)
  circle A0 centre (53.679001, 76.980306) radius 2.925
  circle A1 centre (53.679001, 76.980306) radius 1.5875
  circle A2 centre (84.928799, 76.980306) radius 2.925
  circle A3 centre (84.928799, 76.980306) radius 1.5875
  circle A4 centre (133.012723, -31.446274) radius 2.925
  circle A5 centre (133.012723, -31.446274) radius 1.5875
  circle A6 centre (110.915779, -53.543218) radius 2.925
  circle A7 centre (110.915779, -53.543218) radius 1.5875
  circle A8 centre (2.4892, -5.459293) radius 2.925
  circle A9 centre (2.4892, -5.459293) radius 1.5875
  circle A10 centre (2.4892, 25.790504) radius 2.925
  circle A11 centre (2.4892, 25.790504) radius 1.5875
extrude "Extrusion12" cut sketch "Sketch9 outline for Extrusion12" against normal blind 5.08
sketch "Sketch13" plane through (0, 41.5544, 28.669506) normal (0, 1, 0) x (1, 0, 0)
  line L0 (59.138294, 79.469506) -> (79.469506, 79.469506)
  line L1 (0, 20.331211) -> (0, 0)
  line L2 (116.536213, -51.443044) -> (130.91255, -37.066707)
  line L3 (78.948824, 18.732641) -> (60.736865, 0.520681)
  line L4 (79.469506, 79.469506) -> (59.138294, 79.469506)
  line L5 (69.3039, 79.469506) -> (69.3039, 9.087716)
  line L6 (69.3039, 9.087716) -> (123.185437, -44.79382)
  line L7 (130.91255, -37.066707) -> (116.536213, -51.443044)
  line L8 (0, 10.165606) -> (69.3039, 10.165606)
  circle A0 centre (15.875, 10.165606) radius 6.35
  circle A1 centre (69.3039, 63.594506) radius 6.35
  circle A2 centre (111.960117, -33.5685) radius 6.35
  circle A3 centre (41.275, 10.165606) radius 6.35
  circle A4 centre (69.3039, 38.194506) radius 6.35
  circle A5 centre (93.999604, -15.607988) radius 6.35
  circle A6 centre (76.039092, 2.352524) radius 6.35
  point P0 (0, 28.669506)
  dimension "d68" = 12.7
  dimension "d69" = 15.875
  dimension "d72" = 12.7
  dimension "d73" = 15.875
  dimension "d77" = 12.7
  dimension "d78" = 15.875
  dimension "d83" = 25.4
  dimension "d90" = 25.4
  dimension "d97" = 25.4
extrude "Extrusion13" [suppressed]
sketch "Sketch15" plane through (0, 0, 8.338294) normal (0, -1, 0) x (1, 0, 0)
  line L0 (0, 0) -> (0, 20.331211)
  line L1 (116.754985, -37.31401) -> (68.393487, 11.047489)
  line L2 (68.393487, 11.047489) -> (118.02233, 60.676332)
  line L3 (68.393487, 11.047489) -> (18.764644, 60.676332) construction
  line L4 (73.512233, 12.753737) -> (70.099736, 16.166235)
  line L5 (70.099736, 16.166235) -> (63.274741, 9.34124)
  line L6 (63.274741, 9.34124) -> (66.687238, 5.928743)
  line L7 (66.687238, 5.928743) -> (73.512233, 12.753737)
  line L8 (73.512233, 12.753737) -> (63.274741, 9.34124) construction
  line L9 (70.099736, 16.166235) -> (66.687238, 5.928743) construction
  line L10 (78.002361, 12.753737) -> (70.099736, 20.656363)
  line L11 (70.099736, 20.656363) -> (58.784613, 9.34124)
  line L12 (58.784613, 9.34124) -> (66.687238, 1.438615)
  line L13 (66.687238, 1.438615) -> (78.002361, 12.753737)
  line L14 (78.002361, 12.753737) -> (58.784613, 9.34124) construction
  line L15 (70.099736, 20.656363) -> (66.687238, 1.438615) construction
  point P0 (0, -8.338294)
  dimension "d104" = 90
  dimension "d105" = 4.826
  dimension "d106" = 9.652
  dimension "d107" = 11.176
  dimension "d108" = 16.002
sketch "Sketch15 outline for Extrusion14" plane through (0, 0, 8.338294) normal (0, -1, 0) x (1, 0, 0)
  line L0 (66.687238, 1.438615) -> (78.002361, 12.753737)
  line L1 (58.784613, 9.34124) -> (66.687238, 1.438615)
  line L2 (78.002361, 12.753737) -> (70.099736, 20.656363)
  line L3 (70.099736, 20.656363) -> (58.784613, 9.34124)
  line L4 (73.512233, 12.753737) -> (66.687238, 5.928743)
  line L5 (70.099736, 16.166235) -> (73.512233, 12.753737)
  line L6 (63.274741, 9.34124) -> (70.099736, 16.166235)
  line L7 (66.687238, 5.928743) -> (63.274741, 9.34124)
extrude "Extrusion14" add sketch "Sketch15 outline for Extrusion14" along normal blind 12.7
sketch "Sketch16" plane through (58.784613, 0, 17.679534) normal (-0.7071068, 0, 0.7071068) x (0.7071068, 0, 0.7071068)
  line L0 (0, 0) -> (0, -12.7) projected
  line L1 (16.002, -12.7) -> (0, -12.7) projected
  circle A0 centre (8.001, -7.112) radius 3.175
  point P0 (-54.068317, 0)
  dimension "d111" = 6.35
  dimension "d112" = 8.001
  dimension "d113" = 5.588
sketch "Sketch16 outline for Extrusion15" plane through (58.784613, 0, 17.679534) normal (-0.7071068, 0, 0.7071068) x (0.7071068, 0, 0.7071068)
  circle A0 centre (8.001, -7.112) radius 3.175
extrude "Extrusion15" cut sketch "Sketch16 outline for Extrusion15" against normal blind 279.4
sketch "Sketch18" plane through (0, 41.5544, 28.669506) normal (0, 1, 0) x (1, 0, 0)
  circle A0 centre (55.931223, 23.87791) radius 2.032
  circle A1 centre (49.619112, 3.536194) radius 2.032
  circle A2 centre (69.401607, 37.348294) radius 2.032
  circle A3 centre (42.744848, 10.129382) radius 2.032
  circle A4 centre (76.275871, 30.755107) radius 2.032
  point P0 (0, 28.669506)
sketch "Sketch18 outline for Extrusion18" plane through (0, 41.5544, 28.669506) normal (0, 1, 0) x (1, 0, 0)
  circle A0 centre (49.619112, 3.536194) radius 2.032
  circle A1 centre (42.744848, 10.129382) radius 2.032
  circle A2 centre (55.931223, 23.87791) radius 2.032
  circle A3 centre (69.401607, 37.348294) radius 2.032
  circle A4 centre (76.275871, 30.755107) radius 2.032
extrude "Extrusion18" cut sketch "Sketch18 outline for Extrusion18" against normal blind 279.4
fillet "Fillet2" radius 6.35 4 edges at (62.7359, 0, 13.7282) (72.3448, 0, 15.4345) (74.051, 0, 25.0433) (64.4422, 0, 23.3371)
fillet "Fillet3" radius 3.175 14 edges at (66.6872, -1.8599, 7.1467) (66.6872, -9.525, 9.7769) (59.952, 0, 27.8272) (58.2458, 0, 9.2381) (76.8349, 0, 10.9443) (56.1544, -1.8599, 17.6795) (74.051, -6.35, 25.0433) (80.6326, -1.8599, 21.092) (76.2633, -6.35, 19.353) (78.0024, -9.525, 21.092) (68.3607, -6.35, 27.2556) (70.0997, -1.8599, 31.6249) (70.0997, -9.525, 28.9947) (58.7846, -9.525, 17.6795)
sketch "Sketch19" plane through (0, 0, 8.338294) normal (0, -1, 0) x (1, 0, 0)
  circle A0 centre (2.4892, 25.790504) radius 1.5875
  circle A1 centre (110.915779, 73.874429) radius 1.5875
  circle A2 centre (53.679001, -56.649094) radius 1.5875
  circle A3 centre (2.4892, -5.459293) radius 1.5875
  circle A4 centre (133.012723, 51.777485) radius 1.5875
  circle A5 centre (84.928799, -56.649094) radius 1.5875
  line L0 (0, 20.331211) -> (0, 0)
  arc A6 (0, 0) -> (7.753357, -8.338294) centre (2.4892, -5.459293) ccw
  line L1 (7.753357, -8.338294) -> (50.8, -8.338294)
  line L2 (50.8, -8.338294) -> (50.8, -51.384937)
  arc A7 (50.8, -51.384937) -> (59.138294, -59.138294) centre (53.679001, -56.649094) ccw
  line L3 (79.469506, -59.138294) -> (59.138294, -59.138294)
  arc A8 (79.469506, -59.138294) -> (87.8078, -51.384937) centre (84.928799, -56.649094) ccw
  line L4 (87.8078, 2.501039) -> (87.8078, -51.384937)
  line L5 (131.326163, 46.019402) -> (87.8078, 2.501039)
  arc A9 (131.326163, 46.019402) -> (130.91255, 57.397918) centre (133.012723, 51.777485) ccw
  line L6 (116.536213, 71.774256) -> (130.91255, 57.397918)
  arc A10 (116.536213, 71.774256) -> (105.157697, 72.187869) centre (110.915779, 73.874429) ccw
  line L7 (61.639334, 28.669506) -> (105.157697, 72.187869)
  line L8 (7.753357, 28.669506) -> (61.639334, 28.669506)
  arc A11 (7.753357, 28.669506) -> (0, 20.331211) centre (2.4892, 25.790504) ccw
  circle A12 centre (76.275871, -10.423895) radius 2.032
  circle A13 centre (49.619112, 16.795017) radius 2.032
  circle A14 centre (69.401607, -17.017083) radius 2.032
  circle A15 centre (42.744848, 10.20183) radius 2.032
  circle A16 centre (55.931223, -3.546699) radius 2.032
  line L9 (66.687238, -7.541641) -> (86.982617, 12.753737)
  line L10 (49.804357, 9.34124) -> (66.687238, -7.541641)
  line L11 (70.099736, 29.636619) -> (49.804357, 9.34124)
  line L12 (86.982617, 12.753737) -> (70.099736, 29.636619)
  point P0 (0, -8.338294)
sketch "Sketch19 outline for Extrusion19" plane through (0, 0, 8.338294) normal (0, -1, 0) x (1, 0, 0)
  arc A0 (7.753357, 28.669506) -> (0, 20.331211) centre (2.4892, 25.790504) ccw
  line L0 (61.639334, 28.669506) -> (7.753357, 28.669506)
  line L1 (0, 20.331211) -> (0, 0)
  line L2 (105.157697, 72.187869) -> (61.639334, 28.669506)
  arc A1 (0, 0) -> (7.753357, -8.338294) centre (2.4892, -5.459293) ccw
  arc A2 (116.536213, 71.774256) -> (105.157697, 72.187869) centre (110.915779, 73.874429) ccw
  line L3 (7.753357, -8.338294) -> (50.8, -8.338294)
  line L4 (130.91255, 57.397918) -> (116.536213, 71.774256)
  line L5 (50.8, -8.338294) -> (50.8, -51.384937)
  arc A3 (131.326163, 46.019402) -> (130.91255, 57.397918) centre (133.012723, 51.777485) ccw
  arc A4 (50.8, -51.384937) -> (59.138294, -59.138294) centre (53.679001, -56.649094) ccw
  line L6 (87.8078, 2.501039) -> (131.326163, 46.019402)
  line L7 (59.138294, -59.138294) -> (79.469506, -59.138294)
  line L8 (87.8078, -51.384937) -> (87.8078, 2.501039)
  arc A5 (79.469506, -59.138294) -> (87.8078, -51.384937) centre (84.928799, -56.649094) ccw
  circle A6 centre (53.679001, -56.649094) radius 1.5875
  circle A7 centre (2.4892, -5.459293) radius 1.5875
  circle A8 centre (55.931223, -3.546699) radius 2.032
  circle A9 centre (84.928799, -56.649094) radius 1.5875
  circle A10 centre (69.401607, -17.017083) radius 2.032
  circle A11 centre (76.275871, -10.423895) radius 2.032
  circle A12 centre (2.4892, 25.790504) radius 1.5875
  circle A13 centre (42.744848, 10.20183) radius 2.032
  circle A14 centre (49.619112, 16.795017) radius 2.032
  line L9 (66.687238, -7.541641) -> (49.804357, 9.34124)
  line L10 (86.982617, 12.753737) -> (66.687238, -7.541641)
  line L11 (70.099736, 29.636619) -> (86.982617, 12.753737)
  line L12 (49.804357, 9.34124) -> (70.099736, 29.636619)
  circle A15 centre (133.012723, 51.777485) radius 1.5875
  circle A16 centre (110.915779, 73.874429) radius 1.5875
extrude "Extrusion19" cut sketch "Sketch19 outline for Extrusion19" against normal blind 50.8
sketch "Sketch20" plane through (70.099736, 41.5544, 37.974913) normal (0, 1, 0) x (0.7071068, 0, -0.7071068)
  line L0 (0, 28.702) -> (0, 0) projected
  line L1 (0, 0) -> (23.876, 0) projected
  line L2 (23.876, 0) -> (23.876, 28.702) projected
  line L3 (23.876, 28.702) -> (0, 28.702) projected
  point P0 (-22.71568, 76.420317)
sketch "Sketch20 outline for Extrusion20" plane through (70.099736, 41.5544, 37.974913) normal (0, 1, 0) x (0.7071068, 0, -0.7071068)
  line L0 (0, 28.702) -> (0, 0)
  line L1 (23.876, 28.702) -> (0, 28.702)
  line L2 (23.876, 0) -> (23.876, 28.702)
  line L3 (0, 0) -> (23.876, 0)
extrude "Extrusion20" cut sketch "Sketch20 outline for Extrusion20" against normal blind 38.1
equation "\"d7\" = d6"
properties part number "shockMount"
